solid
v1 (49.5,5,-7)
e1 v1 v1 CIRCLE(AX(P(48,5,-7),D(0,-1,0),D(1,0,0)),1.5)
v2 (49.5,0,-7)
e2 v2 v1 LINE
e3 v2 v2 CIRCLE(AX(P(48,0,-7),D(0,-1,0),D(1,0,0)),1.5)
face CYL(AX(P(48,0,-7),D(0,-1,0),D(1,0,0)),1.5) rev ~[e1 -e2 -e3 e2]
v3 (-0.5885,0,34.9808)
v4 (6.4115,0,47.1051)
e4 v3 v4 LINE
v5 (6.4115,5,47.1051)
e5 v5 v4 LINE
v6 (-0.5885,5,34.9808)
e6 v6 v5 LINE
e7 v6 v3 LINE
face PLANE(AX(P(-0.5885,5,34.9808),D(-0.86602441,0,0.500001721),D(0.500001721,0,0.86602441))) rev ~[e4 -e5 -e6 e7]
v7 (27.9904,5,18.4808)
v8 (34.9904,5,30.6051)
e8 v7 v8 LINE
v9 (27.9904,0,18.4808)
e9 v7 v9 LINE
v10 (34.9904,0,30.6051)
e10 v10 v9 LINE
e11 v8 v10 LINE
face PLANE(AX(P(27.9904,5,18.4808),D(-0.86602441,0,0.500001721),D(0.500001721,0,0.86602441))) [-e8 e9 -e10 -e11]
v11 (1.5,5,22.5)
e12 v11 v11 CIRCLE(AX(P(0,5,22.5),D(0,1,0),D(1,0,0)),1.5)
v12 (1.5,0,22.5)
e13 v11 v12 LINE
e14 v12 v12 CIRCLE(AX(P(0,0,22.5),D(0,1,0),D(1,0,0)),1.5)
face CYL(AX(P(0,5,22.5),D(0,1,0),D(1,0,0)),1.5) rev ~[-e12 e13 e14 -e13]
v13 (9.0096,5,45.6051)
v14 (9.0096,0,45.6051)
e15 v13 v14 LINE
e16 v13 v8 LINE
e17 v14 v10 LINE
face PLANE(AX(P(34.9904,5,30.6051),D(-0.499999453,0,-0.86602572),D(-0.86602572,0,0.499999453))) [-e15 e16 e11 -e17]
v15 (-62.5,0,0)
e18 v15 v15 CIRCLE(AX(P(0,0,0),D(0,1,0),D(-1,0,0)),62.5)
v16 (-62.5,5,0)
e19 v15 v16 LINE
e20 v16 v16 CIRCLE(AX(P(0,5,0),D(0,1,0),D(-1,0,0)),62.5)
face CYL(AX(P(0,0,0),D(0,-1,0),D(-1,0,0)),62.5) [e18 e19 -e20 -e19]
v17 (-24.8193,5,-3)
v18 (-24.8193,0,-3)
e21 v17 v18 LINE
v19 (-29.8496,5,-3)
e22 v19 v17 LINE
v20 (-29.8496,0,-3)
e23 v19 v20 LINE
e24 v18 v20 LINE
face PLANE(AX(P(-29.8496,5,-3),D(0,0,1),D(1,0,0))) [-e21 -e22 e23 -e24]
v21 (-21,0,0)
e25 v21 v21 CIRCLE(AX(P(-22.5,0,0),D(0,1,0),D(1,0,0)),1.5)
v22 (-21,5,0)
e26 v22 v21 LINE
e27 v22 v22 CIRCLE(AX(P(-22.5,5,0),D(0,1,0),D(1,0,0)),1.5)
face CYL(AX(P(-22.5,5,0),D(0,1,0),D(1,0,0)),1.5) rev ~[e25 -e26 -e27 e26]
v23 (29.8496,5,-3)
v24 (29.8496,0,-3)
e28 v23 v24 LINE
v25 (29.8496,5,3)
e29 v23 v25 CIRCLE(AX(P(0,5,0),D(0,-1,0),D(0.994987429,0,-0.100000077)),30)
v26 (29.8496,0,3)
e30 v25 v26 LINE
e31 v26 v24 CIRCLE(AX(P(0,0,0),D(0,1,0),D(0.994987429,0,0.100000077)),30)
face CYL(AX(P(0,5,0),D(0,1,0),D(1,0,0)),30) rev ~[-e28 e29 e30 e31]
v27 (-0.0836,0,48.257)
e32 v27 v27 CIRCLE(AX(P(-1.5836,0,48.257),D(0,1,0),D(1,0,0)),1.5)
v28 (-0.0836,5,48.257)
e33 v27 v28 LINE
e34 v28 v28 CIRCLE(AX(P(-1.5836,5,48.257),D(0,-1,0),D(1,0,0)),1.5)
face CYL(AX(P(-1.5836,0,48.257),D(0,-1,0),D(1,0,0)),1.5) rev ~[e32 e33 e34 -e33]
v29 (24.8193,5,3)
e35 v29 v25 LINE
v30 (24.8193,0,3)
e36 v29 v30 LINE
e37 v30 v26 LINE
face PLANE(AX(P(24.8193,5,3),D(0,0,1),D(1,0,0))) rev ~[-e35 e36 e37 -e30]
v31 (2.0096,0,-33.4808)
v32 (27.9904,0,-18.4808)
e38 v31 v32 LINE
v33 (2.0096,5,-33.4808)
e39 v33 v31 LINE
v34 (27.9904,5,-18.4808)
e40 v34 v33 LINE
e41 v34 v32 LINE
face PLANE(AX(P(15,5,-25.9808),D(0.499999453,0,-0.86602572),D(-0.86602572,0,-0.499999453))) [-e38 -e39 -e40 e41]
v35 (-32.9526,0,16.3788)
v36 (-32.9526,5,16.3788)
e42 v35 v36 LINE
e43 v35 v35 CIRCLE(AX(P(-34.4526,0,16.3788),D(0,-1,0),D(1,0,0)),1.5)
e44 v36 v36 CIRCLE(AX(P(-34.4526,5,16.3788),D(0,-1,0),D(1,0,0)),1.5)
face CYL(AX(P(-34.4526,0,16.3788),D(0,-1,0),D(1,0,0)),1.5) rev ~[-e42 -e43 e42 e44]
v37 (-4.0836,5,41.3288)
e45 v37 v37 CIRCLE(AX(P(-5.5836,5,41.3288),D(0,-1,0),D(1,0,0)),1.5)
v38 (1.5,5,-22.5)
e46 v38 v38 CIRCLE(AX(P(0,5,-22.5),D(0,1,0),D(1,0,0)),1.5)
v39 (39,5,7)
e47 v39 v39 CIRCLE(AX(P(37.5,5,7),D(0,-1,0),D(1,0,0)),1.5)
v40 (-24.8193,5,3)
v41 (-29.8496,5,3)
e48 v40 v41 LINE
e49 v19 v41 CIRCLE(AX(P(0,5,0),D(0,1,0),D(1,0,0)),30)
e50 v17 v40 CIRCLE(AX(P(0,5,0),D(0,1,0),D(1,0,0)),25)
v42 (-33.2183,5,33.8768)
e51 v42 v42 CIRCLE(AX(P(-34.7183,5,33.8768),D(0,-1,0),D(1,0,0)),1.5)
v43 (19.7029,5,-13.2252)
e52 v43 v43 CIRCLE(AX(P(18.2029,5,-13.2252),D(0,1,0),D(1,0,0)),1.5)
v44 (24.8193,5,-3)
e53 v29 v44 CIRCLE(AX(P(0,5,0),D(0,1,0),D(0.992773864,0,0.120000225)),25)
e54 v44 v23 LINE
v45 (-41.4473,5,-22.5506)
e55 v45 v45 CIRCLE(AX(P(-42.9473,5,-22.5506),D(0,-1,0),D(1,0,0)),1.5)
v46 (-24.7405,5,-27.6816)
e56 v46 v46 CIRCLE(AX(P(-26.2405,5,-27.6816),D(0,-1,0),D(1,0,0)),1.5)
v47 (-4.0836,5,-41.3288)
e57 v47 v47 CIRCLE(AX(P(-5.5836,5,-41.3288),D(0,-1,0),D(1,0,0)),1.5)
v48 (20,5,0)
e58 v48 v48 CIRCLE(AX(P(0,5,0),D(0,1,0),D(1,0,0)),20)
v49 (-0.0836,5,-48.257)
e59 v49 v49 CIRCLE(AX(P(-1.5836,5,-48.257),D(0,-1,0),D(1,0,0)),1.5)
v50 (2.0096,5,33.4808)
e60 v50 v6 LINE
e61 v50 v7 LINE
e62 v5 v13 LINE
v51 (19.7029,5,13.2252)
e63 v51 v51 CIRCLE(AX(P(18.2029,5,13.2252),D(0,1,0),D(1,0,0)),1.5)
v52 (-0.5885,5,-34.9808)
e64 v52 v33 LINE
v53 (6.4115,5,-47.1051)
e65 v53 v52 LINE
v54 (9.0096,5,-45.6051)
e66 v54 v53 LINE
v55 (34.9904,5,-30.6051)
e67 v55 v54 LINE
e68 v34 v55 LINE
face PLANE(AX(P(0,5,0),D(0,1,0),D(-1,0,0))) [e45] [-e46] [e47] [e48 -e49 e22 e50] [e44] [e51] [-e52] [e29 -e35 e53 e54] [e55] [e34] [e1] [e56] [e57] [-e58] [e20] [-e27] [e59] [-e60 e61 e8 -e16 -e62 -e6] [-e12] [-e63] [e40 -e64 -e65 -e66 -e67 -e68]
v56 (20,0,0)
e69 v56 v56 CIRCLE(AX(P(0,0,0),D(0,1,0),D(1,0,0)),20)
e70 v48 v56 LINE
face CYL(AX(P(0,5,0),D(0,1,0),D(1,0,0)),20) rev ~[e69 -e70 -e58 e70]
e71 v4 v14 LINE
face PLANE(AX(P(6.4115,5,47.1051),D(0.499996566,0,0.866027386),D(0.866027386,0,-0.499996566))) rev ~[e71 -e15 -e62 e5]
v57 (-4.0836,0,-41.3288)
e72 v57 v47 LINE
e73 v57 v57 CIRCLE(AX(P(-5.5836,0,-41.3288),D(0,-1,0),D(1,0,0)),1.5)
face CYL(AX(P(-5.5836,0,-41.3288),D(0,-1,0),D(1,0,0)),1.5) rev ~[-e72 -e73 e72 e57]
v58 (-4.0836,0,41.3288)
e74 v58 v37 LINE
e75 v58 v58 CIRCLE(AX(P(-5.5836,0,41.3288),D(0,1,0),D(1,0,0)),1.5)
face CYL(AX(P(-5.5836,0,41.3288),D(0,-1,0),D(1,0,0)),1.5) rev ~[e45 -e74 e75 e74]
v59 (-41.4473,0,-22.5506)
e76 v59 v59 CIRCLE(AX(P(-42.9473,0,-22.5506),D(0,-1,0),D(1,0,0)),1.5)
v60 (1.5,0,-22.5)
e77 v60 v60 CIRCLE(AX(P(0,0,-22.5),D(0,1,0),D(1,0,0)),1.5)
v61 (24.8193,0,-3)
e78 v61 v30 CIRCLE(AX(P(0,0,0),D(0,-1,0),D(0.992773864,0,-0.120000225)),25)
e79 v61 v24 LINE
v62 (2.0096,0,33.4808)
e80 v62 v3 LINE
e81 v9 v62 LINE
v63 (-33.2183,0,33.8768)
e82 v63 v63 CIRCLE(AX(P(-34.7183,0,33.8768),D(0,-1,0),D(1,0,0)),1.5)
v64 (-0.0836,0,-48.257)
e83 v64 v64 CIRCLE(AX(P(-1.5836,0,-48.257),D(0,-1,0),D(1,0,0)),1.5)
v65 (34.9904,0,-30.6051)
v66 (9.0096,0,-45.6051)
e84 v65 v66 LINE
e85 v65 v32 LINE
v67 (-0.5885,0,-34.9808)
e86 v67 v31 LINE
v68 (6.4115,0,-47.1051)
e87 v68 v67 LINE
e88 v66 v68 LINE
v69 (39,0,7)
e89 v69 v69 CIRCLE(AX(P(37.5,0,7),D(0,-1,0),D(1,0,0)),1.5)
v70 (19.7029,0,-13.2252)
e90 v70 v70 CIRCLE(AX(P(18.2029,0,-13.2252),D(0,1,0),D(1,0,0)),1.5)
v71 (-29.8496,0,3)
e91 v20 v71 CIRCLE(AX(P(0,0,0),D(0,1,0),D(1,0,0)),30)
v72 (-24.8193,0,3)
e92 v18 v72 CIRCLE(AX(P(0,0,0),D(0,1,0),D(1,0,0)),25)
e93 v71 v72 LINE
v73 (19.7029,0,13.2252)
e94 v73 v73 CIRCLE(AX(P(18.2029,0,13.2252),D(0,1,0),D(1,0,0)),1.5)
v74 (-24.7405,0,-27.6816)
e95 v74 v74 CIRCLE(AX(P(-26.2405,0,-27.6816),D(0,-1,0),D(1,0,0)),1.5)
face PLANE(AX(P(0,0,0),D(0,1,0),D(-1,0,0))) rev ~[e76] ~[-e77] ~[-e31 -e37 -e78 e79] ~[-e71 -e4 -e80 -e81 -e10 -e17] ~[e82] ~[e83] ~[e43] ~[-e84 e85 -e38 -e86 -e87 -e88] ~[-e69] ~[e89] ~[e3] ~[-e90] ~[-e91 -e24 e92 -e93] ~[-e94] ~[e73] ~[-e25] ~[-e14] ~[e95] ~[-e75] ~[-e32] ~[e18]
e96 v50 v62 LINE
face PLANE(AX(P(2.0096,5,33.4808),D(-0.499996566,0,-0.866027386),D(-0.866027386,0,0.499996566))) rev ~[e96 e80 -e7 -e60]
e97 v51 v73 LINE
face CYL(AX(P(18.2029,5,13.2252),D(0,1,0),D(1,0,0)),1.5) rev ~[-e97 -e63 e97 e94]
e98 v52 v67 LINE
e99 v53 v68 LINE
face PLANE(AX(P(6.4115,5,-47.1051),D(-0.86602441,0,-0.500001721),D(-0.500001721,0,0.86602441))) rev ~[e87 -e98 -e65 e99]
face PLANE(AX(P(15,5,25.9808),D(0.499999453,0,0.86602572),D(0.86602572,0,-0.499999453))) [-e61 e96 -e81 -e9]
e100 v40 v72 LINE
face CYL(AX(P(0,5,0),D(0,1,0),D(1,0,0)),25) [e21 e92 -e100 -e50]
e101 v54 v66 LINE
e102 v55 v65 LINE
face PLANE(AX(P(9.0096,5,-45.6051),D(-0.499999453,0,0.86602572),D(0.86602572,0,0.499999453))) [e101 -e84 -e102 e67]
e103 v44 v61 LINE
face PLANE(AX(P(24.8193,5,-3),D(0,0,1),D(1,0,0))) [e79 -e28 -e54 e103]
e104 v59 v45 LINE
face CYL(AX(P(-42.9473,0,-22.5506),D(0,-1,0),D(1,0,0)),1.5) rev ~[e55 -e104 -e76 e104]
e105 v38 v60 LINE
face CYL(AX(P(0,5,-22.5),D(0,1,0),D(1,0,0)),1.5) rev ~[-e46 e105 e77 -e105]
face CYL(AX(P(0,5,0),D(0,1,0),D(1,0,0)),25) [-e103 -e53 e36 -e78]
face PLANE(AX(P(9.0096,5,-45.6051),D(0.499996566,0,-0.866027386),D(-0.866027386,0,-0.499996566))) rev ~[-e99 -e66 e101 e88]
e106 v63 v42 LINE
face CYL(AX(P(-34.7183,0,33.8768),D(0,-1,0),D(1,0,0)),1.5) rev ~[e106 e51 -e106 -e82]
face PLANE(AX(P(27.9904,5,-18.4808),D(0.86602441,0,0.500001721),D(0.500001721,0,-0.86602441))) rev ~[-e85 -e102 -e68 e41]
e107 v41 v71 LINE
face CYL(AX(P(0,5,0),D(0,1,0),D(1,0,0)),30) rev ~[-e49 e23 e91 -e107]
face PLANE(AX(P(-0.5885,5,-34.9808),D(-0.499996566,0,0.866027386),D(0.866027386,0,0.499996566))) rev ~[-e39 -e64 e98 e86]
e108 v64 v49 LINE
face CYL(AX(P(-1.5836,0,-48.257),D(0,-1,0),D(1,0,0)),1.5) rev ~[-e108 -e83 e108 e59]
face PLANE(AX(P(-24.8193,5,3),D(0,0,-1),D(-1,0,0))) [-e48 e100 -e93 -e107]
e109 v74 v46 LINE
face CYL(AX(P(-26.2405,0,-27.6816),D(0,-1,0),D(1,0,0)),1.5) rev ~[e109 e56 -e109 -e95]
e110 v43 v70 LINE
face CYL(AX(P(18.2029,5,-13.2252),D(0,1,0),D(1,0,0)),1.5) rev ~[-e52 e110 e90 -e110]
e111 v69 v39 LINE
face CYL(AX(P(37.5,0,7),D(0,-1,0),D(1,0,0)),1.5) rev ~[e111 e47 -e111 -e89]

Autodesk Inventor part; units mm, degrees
ref_plane "YZ Plane" through (0, 0, 0) normal (1, 0, 0) x (0, 1, 0)
ref_plane "XZ Plane" through (0, 0, 0) normal (0, 1, 0) x (-1, 0, 0)
ref_plane "XY Plane" through (0, 0, 0) normal (0, 0, 1) x (1, 0, 0)
sketch "Sketch1" plane through (0, 0, 0) normal (0, 1, 0) x (-1, 0, 0)
  line L0 (0, 0) -> (50, 0) construction
  line L1 (0, 0) -> (50, 0) construction
  line L2 (0, 0) -> (-36, 0)
  circle A0 centre (0, 0) radius 25
  line L3 (-60, -10) -> (-60, 10)
  circle A1 centre (0, 0) radius 61
  circle A2 centre (0, 0) radius 62.5
  point P0 (62.509, -33.0548)
  point P1 (12.6591, 21.558)
  point P2 (24.4148, 5.3777)
  point P3 (24.4148, -5.3777)
  point P4 (-22.9129, 10)
  point P5 (-22.9129, -10)
  point P6 (12.6591, -21.558)
  dimension "d2" = 36
  dimension "d3" = 50
  dimension "d26" = 122
  dimension "d154" = 125
extrude "Extrusion1" add sketch "Sketch1" along normal blind 5 contours A0 | A1 | A2
sketch "Sketch2" plane through (0, 5, 0) normal (0, 1, 0) x (1, 0, 0)
  circle A0 centre (0, 0) radius 20
  dimension "d6" = 40
extrude "Extrusion2" cut sketch "Sketch2" against normal up to next
sketch "Sketch3" plane through (0, 5, 0) normal (0, 1, 0) x (1, 0, 0)
  line L0 (22.1416, 4) -> (20.8701, 4)
  line L1 (22.1416, -4) -> (20.8701, -4)
  line L2 (24.6779, 4) -> (22.1416, 4)
  line L3 (24.6779, -4) -> (22.1416, -4)
  line L4 (-15.5618, -16.2506) -> (-14.5332, -15.5032)
  line L5 (-15.5618, 16.2506) -> (-14.5332, 15.5032)
  line L6 (-20.2641, -9.7784) -> (-19.2354, -9.0311)
  line L7 (-17.6137, -17.7414) -> (-15.5618, -16.2506)
  line L8 (-22.316, -11.2693) -> (-20.2641, -9.7784)
  line L9 (-20.2641, 9.7784) -> (-19.2354, 9.0311)
  line L10 (-17.6137, 17.7414) -> (-15.5618, 16.2506)
  line L11 (-22.316, 11.2693) -> (-20.2641, 9.7784)
  line L12 (-23.5374, 22.0452) -> (-13.679, 22.0452) construction
  arc A0 (-17.6137, -17.7414) -> (24.6779, -4) centre (0, 0) ccw
  arc A1 (24.6779, 4) -> (-17.6137, 17.7414) centre (0, 0) ccw
  arc A2 (-22.316, 11.2693) -> (-22.316, -11.2693) centre (0, 0) ccw
  line L13 (20.8701, 4) -> (15.8701, 4)
  line L14 (15.8701, 4) -> (15.8701, -4)
  line L15 (15.8701, -4) -> (20.8701, -4)
  line L16 (-14.5332, 15.5032) -> (-10.4881, 12.5643)
  line L17 (-10.4881, 12.5643) -> (-15.1903, 6.0922)
  line L18 (-15.1903, 6.0922) -> (-19.2354, 9.0311)
  line L19 (-19.2354, -9.0311) -> (-15.1903, -6.0922)
  line L20 (-15.1903, -6.0922) -> (-10.4881, -12.5643)
  line L21 (-10.4881, -12.5643) -> (-14.5332, -15.5032)
  circle A3 centre (-22.5, 0) radius 1.5
  circle A4 centre (0, 22.5) radius 1.5
  circle A5 centre (18.2029, 13.2252) radius 1.5
  circle A6 centre (18.2029, -13.2252) radius 1.5
  circle A7 centre (0, -22.5) radius 1.5
  circle A8 centre (0, 0) radius 4
  line L22 (0, 0) -> (8, 0)
  line L23 (8, 0) -> (8, 7.5)
  line L24 (8, 0) -> (8, -7.5)
  circle A9 centre (8, -7.5) radius 2.5
  circle A10 centre (8, 7.5) radius 2.5
  point P0 (-23.5374, -22.0452)
  point P1 (-28.2397, -15.5731)
  dimension "d9" = 36
  dimension "d10" = 5
  dimension "d11" = 5
  dimension "d12" = 3
  dimension "d13" = 3
  dimension "d14" = 3
  dimension "d15" = 3
  dimension "d16" = 3
  dimension "d17" = 8
  dimension "d18" = 8
  dimension "d19" = 7.5
  dimension "d20" = 7.5
  dimension "d21" = 5
  dimension "d22" = 5
extrude "Extrusion3" cut sketch "Sketch3" against normal up to next contours A3 | A4 | A5 | A6 | A7
sketch "Sketch5" plane through (0, 5, 0) normal (0, 1, 0) x (1, 0, 0)
  line L0 (0, 0) -> (37.5601, 0) construction
  circle A0 centre (0, 0) radius 25
  line L1 (0, 0) -> (15.7675, -27.31)
  line L2 (0, 0) -> (31.5349, 0) construction
  line L3 (0, 0) -> (19.8269, 34.3411)
  line L4 (0, 0) -> (39.6537, 0) construction
  line L5 (12.5, 21.6506) -> (15, 25.9808)
  line L6 (12.5, -21.6506) -> (15, -25.9808)
  line L7 (15, -25.9808) -> (27.9904, -18.4808)
  line L8 (27.9904, -18.4808) -> (34.9904, -30.6051)
  line L9 (34.9904, -30.6051) -> (22, -38.1051)
  line L10 (22, -38.1051) -> (15, -25.9808)
  line L11 (22, -38.1051) -> (15, -25.9808)
  line L12 (15, -25.9808) -> (2.0096, -33.4808)
  line L13 (2.0096, -33.4808) -> (9.0096, -45.6051)
  line L14 (9.0096, -45.6051) -> (22, -38.1051)
  line L15 (15, 25.9808) -> (2.0096, 33.4808)
  line L16 (2.0096, 33.4808) -> (9.0096, 45.6051)
  line L17 (9.0096, 45.6051) -> (22, 38.1051)
  line L18 (22, 38.1051) -> (15, 25.9808)
  line L19 (22, 38.1051) -> (15, 25.9808)
  line L20 (15, 25.9808) -> (27.9904, 18.4808)
  line L21 (27.9904, 18.4808) -> (34.9904, 30.6051)
  line L22 (34.9904, 30.6051) -> (22, 38.1051)
  dimension "d41" = 50
  dimension "d47" = 60
  dimension "d48" = 60
  dimension "d49" = 5
  dimension "d50" = 5
  dimension "d51" = 15
  dimension "d52" = 14
  dimension "d53" = 15
  dimension "d54" = 15
  dimension "d55" = 14
  dimension "d56" = 15
extrude "Extrusion5" cut sketch "Sketch5" against normal up to next contours L7 L8 L9 L10 L1 | L1 L10 L14 L13 L12 | L15 L16 L17 L18 L3 | L3 L18 L22 L21 L20
sketch "Sketch8" plane through (0, 0, 0) normal (0, -1, 0) x (1, 0, 0)
  line L0 (-37.9479, -22.6265) -> (-41.4746, -17.7724)
  line L1 (-47.9467, -22.4747) -> (-44.42, -27.3288)
  line L2 (-31.2231, -27.6292) -> (-27.6611, -32.4577)
  circle A0 centre (-42.9473, -22.5506) radius 1.5
  circle A1 centre (-26.2405, -27.6816) radius 1.5
  line L3 (-29.7189, 33.9527) -> (-36.191, 38.655)
  line L4 (-39.7177, 33.8009) -> (-33.2456, 29.0986)
  line L5 (-29.4532, 16.4547) -> (-35.9253, 21.157)
  line L6 (41.5, 10) -> (33.5, 10)
  line L7 (33.5, 4) -> (41.5, 4)
  line L8 (44, -10) -> (52, -10)
  circle A2 centre (48, -7) radius 1.5
  circle A3 centre (37.5, 7) radius 1.5
  circle A4 centre (-34.7183, 33.8768) radius 1.5
  circle A5 centre (-34.4526, 16.3788) radius 1.5
  point P0 (0, 0)
  point P1 (0, 0)
  point P2 (-32.9799, 11.6006)
  point P3 (44, -4)
  dimension "d73" = 3
  dimension "d74" = 3
  dimension "d75" = 3
  dimension "d76" = 3
  dimension "d77" = 3
extrude "Extrusion8" cut sketch "Sketch8" against normal blind 5
sketch "Sketch9" plane through (0, 5, 0) normal (0, 1, 0) x (1, 0, 0)
  line L0 (2.0096, -33.4808) -> (27.9904, -18.4808) projected
  line L1 (9.0096, -45.6051) -> (2.0096, -33.4808)
  line L2 (2.0096, -33.4808) -> (-0.5885, -34.9808)
  line L3 (-0.5885, -34.9808) -> (6.4115, -47.1051)
  line L4 (6.4115, -47.1051) -> (9.0096, -45.6051)
  line L5 (2.0096, 33.4808) -> (9.0096, 45.6051) projected
  line L6 (2.0096, 33.4808) -> (9.0096, 45.6051)
  line L7 (9.0096, 45.6051) -> (6.4115, 47.1051)
  line L8 (6.4115, 47.1051) -> (-0.5885, 34.9808)
  line L9 (-0.5885, 34.9808) -> (2.0096, 33.4808)
  point P0 (0, 0)
  dimension "d80" = 3
  dimension "d81" = 3
extrude "Extrusion9" cut sketch "Sketch9" against normal blind 10
sketch "Sketch10" plane through (0, 0, 0) normal (0, -1, 0) x (1, 0, 0)
  line L0 (6.4115, 47.1051) -> (-9.1769, 56.1051)
  line L1 (-9.1769, 56.1051) -> (-16.1769, 43.9808)
  line L2 (-16.1769, 43.9808) -> (-0.5885, 34.9808)
  line L3 (-9.1769, 56.1051) -> (-11.1769, 52.641)
  line L4 (-16.1769, 43.9808) -> (-14.1769, 47.4449)
  line L5 (-0.5885, 34.9808) -> (1.4115, 38.4449)
  line L6 (1.4115, 38.4449) -> (-2.0526, 40.4449)
  line L7 (6.4115, 47.1051) -> (4.4115, 43.641)
  line L8 (-0.5885, 34.9808) -> (6.4115, 47.1051) projected
  line L9 (4.4115, 43.641) -> (0.9474, 45.641)
  line L10 (27.9904, -18.4808) -> (-0.5885, -34.9808) projected
  line L11 (-16.1769, -43.9808) -> (-9.1769, -56.1051)
  line L12 (6.4115, -47.1051) -> (-0.5885, -34.9808)
  line L13 (-16.1769, -43.9808) -> (-14.1769, -47.4449)
  line L14 (-14.1769, -47.4449) -> (-10.7128, -45.4449)
  line L15 (-9.1769, -56.1051) -> (-11.1769, -52.641)
  line L16 (6.4115, -47.1051) -> (4.4115, -43.641)
  line L17 (-0.5885, -34.9808) -> (6.4115, -47.1051) projected
  line L18 (-0.5885, -34.9808) -> (1.4115, -38.4449)
  line L19 (6.4115, 47.1051) -> (3.8135, 48.6051)
  line L20 (3.8135, 48.6051) -> (-3.1865, 36.4808)
  line L21 (3.8135, 48.6051) -> (-2.6817, 52.3551)
  line L22 (1.8135, 45.141) -> (-2.0836, 47.391)
  line L23 (-2.0836, 47.391) -> (-5.0836, 42.1949)
  line L24 (-0.5885, -34.9808) -> (1.4115, -38.4449)
  line L25 (6.4115, -47.1051) -> (4.4115, -43.641)
  circle A0 centre (-5.5836, -41.3288) radius 1.5
  circle A1 centre (-1.5836, -48.257) radius 1.5
  line L26 (-2.0836, 47.391) -> (-1.5836, 48.257)
  line L27 (-5.0836, 42.1949) -> (-5.5836, 41.3288)
  circle A2 centre (-1.5836, 48.257) radius 1.5
  circle A3 centre (-5.5836, 41.3288) radius 1.5
  point P0 (0, 0)
  dimension "d85" = 14
  dimension "d86" = 4
  dimension "d88" = 4
  dimension "d92" = 4
  dimension "d93" = 4
  dimension "d94" = 4
  dimension "d95" = 4
  dimension "d98" = 18
  dimension "d99" = 4
  dimension "d101" = 4
  dimension "d103" = 4
  dimension "d129" = 3
  dimension "d130" = 7.5
  dimension "d137" = 4.5
  dimension "d140" = 4
  dimension "d146" = 3
  dimension "d148" = 1
  dimension "d149" = 1
  dimension "d150" = 3
  dimension "d151" = 3
extrude "Extrusion13" cut sketch "Sketch10" against normal blind 10 contours A2 L23 L22 | L22 L23 A2 | A0 | A1 | A3
sketch "Sketch11" plane through (0, 5, 0) normal (0, 1, 0) x (1, 0, 0)
  circle A0 centre (0, 0) radius 30
  circle A1 centre (0, 0) radius 30
  circle A2 centre (0, 0) radius 25
  circle A3 centre (0, 0) radius 25
  line L0 (-25, -3) -> (-29.8496, -3)
  line L1 (-24.8193, -3) -> (-25, -3)
  line L2 (-25, 3) -> (-24.8193, 3)
  line L3 (-29.8496, 3) -> (-24.8193, 3)
  line L4 (24.8193, -3) -> (29.8496, -3)
  line L5 (24.8193, 3) -> (29.8496, 3)
extrude "Extrusion14" cut sketch "Sketch11" against normal blind 5 contours A0 L4 A2 L5 | L3 L2 A2 L1 L0 A0
properties part number "upperBasePart2"
